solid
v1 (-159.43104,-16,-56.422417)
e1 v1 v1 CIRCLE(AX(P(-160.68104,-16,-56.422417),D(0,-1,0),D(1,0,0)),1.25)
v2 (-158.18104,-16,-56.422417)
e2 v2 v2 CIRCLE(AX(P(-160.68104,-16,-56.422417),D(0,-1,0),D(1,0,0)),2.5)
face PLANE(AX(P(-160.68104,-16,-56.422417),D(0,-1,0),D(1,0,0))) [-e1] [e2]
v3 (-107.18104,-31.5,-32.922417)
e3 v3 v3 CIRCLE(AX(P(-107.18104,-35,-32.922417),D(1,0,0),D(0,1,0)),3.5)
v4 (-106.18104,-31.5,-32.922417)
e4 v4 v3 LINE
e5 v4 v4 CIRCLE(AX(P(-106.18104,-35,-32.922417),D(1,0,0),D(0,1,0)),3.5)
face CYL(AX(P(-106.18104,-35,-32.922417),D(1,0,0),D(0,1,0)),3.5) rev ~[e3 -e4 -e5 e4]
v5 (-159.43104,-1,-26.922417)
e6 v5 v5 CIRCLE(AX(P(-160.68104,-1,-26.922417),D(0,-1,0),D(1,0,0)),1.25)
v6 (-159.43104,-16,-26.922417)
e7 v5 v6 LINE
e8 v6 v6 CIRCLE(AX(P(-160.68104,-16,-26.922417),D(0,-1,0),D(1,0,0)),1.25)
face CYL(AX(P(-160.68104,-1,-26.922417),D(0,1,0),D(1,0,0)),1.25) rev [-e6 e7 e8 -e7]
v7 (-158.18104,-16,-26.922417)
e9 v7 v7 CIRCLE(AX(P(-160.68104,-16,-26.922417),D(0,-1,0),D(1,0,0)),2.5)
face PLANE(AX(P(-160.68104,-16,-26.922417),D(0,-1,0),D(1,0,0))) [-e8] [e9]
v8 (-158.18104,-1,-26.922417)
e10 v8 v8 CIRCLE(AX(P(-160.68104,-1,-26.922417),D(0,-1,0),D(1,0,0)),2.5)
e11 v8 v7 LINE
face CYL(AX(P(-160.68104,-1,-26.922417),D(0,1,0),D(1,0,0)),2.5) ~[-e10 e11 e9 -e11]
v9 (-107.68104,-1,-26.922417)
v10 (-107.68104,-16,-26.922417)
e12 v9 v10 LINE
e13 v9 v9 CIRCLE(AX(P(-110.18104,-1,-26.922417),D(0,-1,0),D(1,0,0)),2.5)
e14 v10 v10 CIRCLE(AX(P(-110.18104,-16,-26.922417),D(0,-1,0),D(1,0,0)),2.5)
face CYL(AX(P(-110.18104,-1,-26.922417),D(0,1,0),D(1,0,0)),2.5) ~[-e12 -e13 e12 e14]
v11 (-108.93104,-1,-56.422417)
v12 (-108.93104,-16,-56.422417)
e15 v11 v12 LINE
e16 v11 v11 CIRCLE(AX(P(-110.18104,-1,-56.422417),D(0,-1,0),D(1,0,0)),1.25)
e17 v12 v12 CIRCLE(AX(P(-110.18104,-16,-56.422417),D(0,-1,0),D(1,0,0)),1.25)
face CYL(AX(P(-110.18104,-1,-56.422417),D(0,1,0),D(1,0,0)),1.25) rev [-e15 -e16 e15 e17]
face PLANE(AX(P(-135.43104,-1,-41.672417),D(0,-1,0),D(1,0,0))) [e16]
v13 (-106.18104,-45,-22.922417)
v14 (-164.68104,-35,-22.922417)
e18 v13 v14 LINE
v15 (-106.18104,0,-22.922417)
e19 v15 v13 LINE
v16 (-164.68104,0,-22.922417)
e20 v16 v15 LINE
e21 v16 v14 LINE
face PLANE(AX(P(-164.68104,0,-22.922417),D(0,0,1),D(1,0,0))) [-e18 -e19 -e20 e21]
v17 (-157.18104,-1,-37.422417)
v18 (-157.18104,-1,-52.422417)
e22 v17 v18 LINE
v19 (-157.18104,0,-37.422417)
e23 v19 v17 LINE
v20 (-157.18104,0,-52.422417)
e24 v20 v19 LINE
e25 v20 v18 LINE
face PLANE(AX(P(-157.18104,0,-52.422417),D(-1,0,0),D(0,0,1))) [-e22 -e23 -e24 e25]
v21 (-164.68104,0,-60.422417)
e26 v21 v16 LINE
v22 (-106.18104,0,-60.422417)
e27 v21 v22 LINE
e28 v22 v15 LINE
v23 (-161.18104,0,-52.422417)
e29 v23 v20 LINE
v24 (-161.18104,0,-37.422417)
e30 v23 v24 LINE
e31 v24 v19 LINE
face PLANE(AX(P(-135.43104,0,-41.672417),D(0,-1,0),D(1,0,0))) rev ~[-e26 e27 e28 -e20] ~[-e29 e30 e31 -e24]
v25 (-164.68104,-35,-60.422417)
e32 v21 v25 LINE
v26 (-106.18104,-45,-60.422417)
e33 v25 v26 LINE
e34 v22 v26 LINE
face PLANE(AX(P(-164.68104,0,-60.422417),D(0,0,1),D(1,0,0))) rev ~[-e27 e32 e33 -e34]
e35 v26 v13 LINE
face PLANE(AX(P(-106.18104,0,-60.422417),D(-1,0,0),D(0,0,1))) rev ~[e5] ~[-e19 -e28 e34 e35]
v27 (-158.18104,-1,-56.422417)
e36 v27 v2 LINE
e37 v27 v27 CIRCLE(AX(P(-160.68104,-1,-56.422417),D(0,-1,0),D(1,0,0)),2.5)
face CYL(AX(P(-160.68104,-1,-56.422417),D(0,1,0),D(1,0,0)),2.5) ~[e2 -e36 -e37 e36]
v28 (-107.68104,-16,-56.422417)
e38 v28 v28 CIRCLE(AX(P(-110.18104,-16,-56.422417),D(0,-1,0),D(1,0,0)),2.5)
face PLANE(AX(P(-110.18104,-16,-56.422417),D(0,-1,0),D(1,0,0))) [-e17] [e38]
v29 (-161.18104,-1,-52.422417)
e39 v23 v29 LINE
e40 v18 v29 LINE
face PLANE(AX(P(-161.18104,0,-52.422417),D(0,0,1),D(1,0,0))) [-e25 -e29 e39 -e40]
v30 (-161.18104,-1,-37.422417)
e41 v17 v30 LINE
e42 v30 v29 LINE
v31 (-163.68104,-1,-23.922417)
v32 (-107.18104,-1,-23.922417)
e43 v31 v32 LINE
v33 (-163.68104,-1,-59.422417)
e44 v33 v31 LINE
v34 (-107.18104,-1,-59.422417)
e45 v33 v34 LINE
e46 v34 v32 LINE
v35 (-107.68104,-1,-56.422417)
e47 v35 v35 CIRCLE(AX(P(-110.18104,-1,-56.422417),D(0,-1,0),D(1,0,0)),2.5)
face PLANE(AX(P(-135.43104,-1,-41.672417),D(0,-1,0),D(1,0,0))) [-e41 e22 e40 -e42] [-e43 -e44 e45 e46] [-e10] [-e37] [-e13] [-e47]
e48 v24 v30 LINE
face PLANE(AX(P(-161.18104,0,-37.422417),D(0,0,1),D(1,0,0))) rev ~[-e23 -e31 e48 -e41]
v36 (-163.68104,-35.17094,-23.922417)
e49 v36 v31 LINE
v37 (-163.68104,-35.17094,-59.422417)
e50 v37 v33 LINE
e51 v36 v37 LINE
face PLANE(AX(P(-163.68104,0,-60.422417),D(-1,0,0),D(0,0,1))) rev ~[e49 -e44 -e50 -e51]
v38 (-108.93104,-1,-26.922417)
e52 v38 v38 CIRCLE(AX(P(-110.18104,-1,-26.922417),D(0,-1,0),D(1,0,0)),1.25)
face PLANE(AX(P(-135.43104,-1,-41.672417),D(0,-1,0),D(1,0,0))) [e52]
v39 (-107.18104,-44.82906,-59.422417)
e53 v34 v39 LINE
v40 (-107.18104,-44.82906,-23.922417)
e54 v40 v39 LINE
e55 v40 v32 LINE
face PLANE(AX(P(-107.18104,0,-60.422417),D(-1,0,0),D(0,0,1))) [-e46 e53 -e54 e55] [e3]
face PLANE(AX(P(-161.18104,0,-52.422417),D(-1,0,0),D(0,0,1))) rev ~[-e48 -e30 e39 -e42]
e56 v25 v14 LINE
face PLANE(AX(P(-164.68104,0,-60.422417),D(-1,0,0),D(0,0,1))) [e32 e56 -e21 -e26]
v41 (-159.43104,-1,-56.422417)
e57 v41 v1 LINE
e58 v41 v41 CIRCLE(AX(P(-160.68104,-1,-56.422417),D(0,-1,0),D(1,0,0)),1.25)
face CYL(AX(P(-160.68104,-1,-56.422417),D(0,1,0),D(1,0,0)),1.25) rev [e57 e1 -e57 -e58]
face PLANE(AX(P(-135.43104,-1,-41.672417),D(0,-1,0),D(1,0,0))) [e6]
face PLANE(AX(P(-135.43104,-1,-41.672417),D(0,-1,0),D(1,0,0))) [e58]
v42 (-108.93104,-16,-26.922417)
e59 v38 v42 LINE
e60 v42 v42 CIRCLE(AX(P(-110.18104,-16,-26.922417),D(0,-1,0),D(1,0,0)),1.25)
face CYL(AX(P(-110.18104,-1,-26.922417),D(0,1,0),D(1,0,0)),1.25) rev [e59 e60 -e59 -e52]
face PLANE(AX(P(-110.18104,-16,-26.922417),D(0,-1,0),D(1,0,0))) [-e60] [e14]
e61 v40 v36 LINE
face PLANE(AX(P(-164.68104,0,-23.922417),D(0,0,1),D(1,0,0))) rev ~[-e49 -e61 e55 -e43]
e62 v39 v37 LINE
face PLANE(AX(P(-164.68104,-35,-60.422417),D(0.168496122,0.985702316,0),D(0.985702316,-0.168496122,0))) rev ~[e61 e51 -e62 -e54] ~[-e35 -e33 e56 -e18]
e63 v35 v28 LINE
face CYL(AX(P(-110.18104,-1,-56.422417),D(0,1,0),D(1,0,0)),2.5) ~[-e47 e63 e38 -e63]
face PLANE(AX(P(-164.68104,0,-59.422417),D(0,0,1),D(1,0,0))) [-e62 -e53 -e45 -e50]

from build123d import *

# Parameters (mm, degrees)
F0_W     = 58.5
F0_H     = 37.5
F0_W_2   = 4
F0_H_2   = 15
F1_DEPTH = 45
F2_T     = -1
F4_DEPTH = 52.9
F5_R     = 3.5
F6_DEPTH = 25
F7_DEPTH = 25
F8_R     = 2.5
F8_R_2   = 1.25
F9_DEPTH = 15


# Not quite as in the source:
# - a feature names something its author has since deleted; it is built from what else it names


with BuildPart() as f1:
    # F0 (on Front) → F1 (new body)
    with BuildSketch(Plane.XZ):
        with Locations((-135.4310402274, -41.6724174619)):
            Rectangle(F0_W, F0_H)
        with Locations((-159.1810402274, -44.9224174619)):
            Rectangle(F0_W_2, F0_H_2, mode=Mode.SUBTRACT)
        with Locations((-159.1810402274, -44.9224174619)):
            Rectangle(F0_W_2, F0_H_2)
    extrude(amount=F1_DEPTH)

    # F2
    f2_openings = [f1.faces().sort_by_distance(p)[0] for p in [
        (-135.43104, -45, -41.672417),
    ]]
    offset(amount=F2_T, openings=f2_openings)

    # F3 (on face) → F4 (cut)
    with BuildSketch(Plane(origin=(0, 0, -60.4224174619), x_dir=(1, 0, 0), z_dir=(0, 0, -1))):
        Polygon((-164.6810402274, 45), (-164.6810402274, 35), (-106.1810402274, 45), align=None)
    extrude(amount=-F4_DEPTH, mode=Mode.SUBTRACT)

    # F5 (on face) → F6 (cut)
    with BuildSketch(Plane.YZ.offset(-106.1810402274)):
        with Locations((-35, -32.9224174619)):
            Circle(F5_R)
    extrude(amount=-F6_DEPTH, mode=Mode.SUBTRACT)

    # F0 (on Front) → F7 (cut)
    with BuildSketch(Plane.XZ):
        with Locations((-159.1810402274, -44.9224174619)):
            Rectangle(F0_W_2, F0_H_2)
    extrude(amount=F7_DEPTH, mode=Mode.SUBTRACT)

    # F8 (on face) → F9 (join)
    with BuildSketch(Plane.XZ.offset(1)):
        with Locations((-110.1810402274, -26.9224174619)):
            Circle(F8_R)
        with Locations((-110.1810402274, -26.9224174619)):
            Circle(F8_R_2, mode=Mode.SUBTRACT)
        with Locations((-110.1810402274, -56.4224174619)):
            Circle(F8_R)
        with Locations((-110.1810402274, -56.4224174619)):
            Circle(F8_R_2, mode=Mode.SUBTRACT)
        with Locations((-160.6810402274, -56.4224174619)):
            Circle(F8_R)
        with Locations((-160.6810402274, -56.4224174619)):
            Circle(F8_R_2, mode=Mode.SUBTRACT)
        with Locations((-160.6810402274, -26.9224174619)):
            Circle(F8_R)
        with Locations((-160.6810402274, -26.9224174619)):
            Circle(F8_R_2, mode=Mode.SUBTRACT)
    extrude(amount=F9_DEPTH)


solid = f1.part
